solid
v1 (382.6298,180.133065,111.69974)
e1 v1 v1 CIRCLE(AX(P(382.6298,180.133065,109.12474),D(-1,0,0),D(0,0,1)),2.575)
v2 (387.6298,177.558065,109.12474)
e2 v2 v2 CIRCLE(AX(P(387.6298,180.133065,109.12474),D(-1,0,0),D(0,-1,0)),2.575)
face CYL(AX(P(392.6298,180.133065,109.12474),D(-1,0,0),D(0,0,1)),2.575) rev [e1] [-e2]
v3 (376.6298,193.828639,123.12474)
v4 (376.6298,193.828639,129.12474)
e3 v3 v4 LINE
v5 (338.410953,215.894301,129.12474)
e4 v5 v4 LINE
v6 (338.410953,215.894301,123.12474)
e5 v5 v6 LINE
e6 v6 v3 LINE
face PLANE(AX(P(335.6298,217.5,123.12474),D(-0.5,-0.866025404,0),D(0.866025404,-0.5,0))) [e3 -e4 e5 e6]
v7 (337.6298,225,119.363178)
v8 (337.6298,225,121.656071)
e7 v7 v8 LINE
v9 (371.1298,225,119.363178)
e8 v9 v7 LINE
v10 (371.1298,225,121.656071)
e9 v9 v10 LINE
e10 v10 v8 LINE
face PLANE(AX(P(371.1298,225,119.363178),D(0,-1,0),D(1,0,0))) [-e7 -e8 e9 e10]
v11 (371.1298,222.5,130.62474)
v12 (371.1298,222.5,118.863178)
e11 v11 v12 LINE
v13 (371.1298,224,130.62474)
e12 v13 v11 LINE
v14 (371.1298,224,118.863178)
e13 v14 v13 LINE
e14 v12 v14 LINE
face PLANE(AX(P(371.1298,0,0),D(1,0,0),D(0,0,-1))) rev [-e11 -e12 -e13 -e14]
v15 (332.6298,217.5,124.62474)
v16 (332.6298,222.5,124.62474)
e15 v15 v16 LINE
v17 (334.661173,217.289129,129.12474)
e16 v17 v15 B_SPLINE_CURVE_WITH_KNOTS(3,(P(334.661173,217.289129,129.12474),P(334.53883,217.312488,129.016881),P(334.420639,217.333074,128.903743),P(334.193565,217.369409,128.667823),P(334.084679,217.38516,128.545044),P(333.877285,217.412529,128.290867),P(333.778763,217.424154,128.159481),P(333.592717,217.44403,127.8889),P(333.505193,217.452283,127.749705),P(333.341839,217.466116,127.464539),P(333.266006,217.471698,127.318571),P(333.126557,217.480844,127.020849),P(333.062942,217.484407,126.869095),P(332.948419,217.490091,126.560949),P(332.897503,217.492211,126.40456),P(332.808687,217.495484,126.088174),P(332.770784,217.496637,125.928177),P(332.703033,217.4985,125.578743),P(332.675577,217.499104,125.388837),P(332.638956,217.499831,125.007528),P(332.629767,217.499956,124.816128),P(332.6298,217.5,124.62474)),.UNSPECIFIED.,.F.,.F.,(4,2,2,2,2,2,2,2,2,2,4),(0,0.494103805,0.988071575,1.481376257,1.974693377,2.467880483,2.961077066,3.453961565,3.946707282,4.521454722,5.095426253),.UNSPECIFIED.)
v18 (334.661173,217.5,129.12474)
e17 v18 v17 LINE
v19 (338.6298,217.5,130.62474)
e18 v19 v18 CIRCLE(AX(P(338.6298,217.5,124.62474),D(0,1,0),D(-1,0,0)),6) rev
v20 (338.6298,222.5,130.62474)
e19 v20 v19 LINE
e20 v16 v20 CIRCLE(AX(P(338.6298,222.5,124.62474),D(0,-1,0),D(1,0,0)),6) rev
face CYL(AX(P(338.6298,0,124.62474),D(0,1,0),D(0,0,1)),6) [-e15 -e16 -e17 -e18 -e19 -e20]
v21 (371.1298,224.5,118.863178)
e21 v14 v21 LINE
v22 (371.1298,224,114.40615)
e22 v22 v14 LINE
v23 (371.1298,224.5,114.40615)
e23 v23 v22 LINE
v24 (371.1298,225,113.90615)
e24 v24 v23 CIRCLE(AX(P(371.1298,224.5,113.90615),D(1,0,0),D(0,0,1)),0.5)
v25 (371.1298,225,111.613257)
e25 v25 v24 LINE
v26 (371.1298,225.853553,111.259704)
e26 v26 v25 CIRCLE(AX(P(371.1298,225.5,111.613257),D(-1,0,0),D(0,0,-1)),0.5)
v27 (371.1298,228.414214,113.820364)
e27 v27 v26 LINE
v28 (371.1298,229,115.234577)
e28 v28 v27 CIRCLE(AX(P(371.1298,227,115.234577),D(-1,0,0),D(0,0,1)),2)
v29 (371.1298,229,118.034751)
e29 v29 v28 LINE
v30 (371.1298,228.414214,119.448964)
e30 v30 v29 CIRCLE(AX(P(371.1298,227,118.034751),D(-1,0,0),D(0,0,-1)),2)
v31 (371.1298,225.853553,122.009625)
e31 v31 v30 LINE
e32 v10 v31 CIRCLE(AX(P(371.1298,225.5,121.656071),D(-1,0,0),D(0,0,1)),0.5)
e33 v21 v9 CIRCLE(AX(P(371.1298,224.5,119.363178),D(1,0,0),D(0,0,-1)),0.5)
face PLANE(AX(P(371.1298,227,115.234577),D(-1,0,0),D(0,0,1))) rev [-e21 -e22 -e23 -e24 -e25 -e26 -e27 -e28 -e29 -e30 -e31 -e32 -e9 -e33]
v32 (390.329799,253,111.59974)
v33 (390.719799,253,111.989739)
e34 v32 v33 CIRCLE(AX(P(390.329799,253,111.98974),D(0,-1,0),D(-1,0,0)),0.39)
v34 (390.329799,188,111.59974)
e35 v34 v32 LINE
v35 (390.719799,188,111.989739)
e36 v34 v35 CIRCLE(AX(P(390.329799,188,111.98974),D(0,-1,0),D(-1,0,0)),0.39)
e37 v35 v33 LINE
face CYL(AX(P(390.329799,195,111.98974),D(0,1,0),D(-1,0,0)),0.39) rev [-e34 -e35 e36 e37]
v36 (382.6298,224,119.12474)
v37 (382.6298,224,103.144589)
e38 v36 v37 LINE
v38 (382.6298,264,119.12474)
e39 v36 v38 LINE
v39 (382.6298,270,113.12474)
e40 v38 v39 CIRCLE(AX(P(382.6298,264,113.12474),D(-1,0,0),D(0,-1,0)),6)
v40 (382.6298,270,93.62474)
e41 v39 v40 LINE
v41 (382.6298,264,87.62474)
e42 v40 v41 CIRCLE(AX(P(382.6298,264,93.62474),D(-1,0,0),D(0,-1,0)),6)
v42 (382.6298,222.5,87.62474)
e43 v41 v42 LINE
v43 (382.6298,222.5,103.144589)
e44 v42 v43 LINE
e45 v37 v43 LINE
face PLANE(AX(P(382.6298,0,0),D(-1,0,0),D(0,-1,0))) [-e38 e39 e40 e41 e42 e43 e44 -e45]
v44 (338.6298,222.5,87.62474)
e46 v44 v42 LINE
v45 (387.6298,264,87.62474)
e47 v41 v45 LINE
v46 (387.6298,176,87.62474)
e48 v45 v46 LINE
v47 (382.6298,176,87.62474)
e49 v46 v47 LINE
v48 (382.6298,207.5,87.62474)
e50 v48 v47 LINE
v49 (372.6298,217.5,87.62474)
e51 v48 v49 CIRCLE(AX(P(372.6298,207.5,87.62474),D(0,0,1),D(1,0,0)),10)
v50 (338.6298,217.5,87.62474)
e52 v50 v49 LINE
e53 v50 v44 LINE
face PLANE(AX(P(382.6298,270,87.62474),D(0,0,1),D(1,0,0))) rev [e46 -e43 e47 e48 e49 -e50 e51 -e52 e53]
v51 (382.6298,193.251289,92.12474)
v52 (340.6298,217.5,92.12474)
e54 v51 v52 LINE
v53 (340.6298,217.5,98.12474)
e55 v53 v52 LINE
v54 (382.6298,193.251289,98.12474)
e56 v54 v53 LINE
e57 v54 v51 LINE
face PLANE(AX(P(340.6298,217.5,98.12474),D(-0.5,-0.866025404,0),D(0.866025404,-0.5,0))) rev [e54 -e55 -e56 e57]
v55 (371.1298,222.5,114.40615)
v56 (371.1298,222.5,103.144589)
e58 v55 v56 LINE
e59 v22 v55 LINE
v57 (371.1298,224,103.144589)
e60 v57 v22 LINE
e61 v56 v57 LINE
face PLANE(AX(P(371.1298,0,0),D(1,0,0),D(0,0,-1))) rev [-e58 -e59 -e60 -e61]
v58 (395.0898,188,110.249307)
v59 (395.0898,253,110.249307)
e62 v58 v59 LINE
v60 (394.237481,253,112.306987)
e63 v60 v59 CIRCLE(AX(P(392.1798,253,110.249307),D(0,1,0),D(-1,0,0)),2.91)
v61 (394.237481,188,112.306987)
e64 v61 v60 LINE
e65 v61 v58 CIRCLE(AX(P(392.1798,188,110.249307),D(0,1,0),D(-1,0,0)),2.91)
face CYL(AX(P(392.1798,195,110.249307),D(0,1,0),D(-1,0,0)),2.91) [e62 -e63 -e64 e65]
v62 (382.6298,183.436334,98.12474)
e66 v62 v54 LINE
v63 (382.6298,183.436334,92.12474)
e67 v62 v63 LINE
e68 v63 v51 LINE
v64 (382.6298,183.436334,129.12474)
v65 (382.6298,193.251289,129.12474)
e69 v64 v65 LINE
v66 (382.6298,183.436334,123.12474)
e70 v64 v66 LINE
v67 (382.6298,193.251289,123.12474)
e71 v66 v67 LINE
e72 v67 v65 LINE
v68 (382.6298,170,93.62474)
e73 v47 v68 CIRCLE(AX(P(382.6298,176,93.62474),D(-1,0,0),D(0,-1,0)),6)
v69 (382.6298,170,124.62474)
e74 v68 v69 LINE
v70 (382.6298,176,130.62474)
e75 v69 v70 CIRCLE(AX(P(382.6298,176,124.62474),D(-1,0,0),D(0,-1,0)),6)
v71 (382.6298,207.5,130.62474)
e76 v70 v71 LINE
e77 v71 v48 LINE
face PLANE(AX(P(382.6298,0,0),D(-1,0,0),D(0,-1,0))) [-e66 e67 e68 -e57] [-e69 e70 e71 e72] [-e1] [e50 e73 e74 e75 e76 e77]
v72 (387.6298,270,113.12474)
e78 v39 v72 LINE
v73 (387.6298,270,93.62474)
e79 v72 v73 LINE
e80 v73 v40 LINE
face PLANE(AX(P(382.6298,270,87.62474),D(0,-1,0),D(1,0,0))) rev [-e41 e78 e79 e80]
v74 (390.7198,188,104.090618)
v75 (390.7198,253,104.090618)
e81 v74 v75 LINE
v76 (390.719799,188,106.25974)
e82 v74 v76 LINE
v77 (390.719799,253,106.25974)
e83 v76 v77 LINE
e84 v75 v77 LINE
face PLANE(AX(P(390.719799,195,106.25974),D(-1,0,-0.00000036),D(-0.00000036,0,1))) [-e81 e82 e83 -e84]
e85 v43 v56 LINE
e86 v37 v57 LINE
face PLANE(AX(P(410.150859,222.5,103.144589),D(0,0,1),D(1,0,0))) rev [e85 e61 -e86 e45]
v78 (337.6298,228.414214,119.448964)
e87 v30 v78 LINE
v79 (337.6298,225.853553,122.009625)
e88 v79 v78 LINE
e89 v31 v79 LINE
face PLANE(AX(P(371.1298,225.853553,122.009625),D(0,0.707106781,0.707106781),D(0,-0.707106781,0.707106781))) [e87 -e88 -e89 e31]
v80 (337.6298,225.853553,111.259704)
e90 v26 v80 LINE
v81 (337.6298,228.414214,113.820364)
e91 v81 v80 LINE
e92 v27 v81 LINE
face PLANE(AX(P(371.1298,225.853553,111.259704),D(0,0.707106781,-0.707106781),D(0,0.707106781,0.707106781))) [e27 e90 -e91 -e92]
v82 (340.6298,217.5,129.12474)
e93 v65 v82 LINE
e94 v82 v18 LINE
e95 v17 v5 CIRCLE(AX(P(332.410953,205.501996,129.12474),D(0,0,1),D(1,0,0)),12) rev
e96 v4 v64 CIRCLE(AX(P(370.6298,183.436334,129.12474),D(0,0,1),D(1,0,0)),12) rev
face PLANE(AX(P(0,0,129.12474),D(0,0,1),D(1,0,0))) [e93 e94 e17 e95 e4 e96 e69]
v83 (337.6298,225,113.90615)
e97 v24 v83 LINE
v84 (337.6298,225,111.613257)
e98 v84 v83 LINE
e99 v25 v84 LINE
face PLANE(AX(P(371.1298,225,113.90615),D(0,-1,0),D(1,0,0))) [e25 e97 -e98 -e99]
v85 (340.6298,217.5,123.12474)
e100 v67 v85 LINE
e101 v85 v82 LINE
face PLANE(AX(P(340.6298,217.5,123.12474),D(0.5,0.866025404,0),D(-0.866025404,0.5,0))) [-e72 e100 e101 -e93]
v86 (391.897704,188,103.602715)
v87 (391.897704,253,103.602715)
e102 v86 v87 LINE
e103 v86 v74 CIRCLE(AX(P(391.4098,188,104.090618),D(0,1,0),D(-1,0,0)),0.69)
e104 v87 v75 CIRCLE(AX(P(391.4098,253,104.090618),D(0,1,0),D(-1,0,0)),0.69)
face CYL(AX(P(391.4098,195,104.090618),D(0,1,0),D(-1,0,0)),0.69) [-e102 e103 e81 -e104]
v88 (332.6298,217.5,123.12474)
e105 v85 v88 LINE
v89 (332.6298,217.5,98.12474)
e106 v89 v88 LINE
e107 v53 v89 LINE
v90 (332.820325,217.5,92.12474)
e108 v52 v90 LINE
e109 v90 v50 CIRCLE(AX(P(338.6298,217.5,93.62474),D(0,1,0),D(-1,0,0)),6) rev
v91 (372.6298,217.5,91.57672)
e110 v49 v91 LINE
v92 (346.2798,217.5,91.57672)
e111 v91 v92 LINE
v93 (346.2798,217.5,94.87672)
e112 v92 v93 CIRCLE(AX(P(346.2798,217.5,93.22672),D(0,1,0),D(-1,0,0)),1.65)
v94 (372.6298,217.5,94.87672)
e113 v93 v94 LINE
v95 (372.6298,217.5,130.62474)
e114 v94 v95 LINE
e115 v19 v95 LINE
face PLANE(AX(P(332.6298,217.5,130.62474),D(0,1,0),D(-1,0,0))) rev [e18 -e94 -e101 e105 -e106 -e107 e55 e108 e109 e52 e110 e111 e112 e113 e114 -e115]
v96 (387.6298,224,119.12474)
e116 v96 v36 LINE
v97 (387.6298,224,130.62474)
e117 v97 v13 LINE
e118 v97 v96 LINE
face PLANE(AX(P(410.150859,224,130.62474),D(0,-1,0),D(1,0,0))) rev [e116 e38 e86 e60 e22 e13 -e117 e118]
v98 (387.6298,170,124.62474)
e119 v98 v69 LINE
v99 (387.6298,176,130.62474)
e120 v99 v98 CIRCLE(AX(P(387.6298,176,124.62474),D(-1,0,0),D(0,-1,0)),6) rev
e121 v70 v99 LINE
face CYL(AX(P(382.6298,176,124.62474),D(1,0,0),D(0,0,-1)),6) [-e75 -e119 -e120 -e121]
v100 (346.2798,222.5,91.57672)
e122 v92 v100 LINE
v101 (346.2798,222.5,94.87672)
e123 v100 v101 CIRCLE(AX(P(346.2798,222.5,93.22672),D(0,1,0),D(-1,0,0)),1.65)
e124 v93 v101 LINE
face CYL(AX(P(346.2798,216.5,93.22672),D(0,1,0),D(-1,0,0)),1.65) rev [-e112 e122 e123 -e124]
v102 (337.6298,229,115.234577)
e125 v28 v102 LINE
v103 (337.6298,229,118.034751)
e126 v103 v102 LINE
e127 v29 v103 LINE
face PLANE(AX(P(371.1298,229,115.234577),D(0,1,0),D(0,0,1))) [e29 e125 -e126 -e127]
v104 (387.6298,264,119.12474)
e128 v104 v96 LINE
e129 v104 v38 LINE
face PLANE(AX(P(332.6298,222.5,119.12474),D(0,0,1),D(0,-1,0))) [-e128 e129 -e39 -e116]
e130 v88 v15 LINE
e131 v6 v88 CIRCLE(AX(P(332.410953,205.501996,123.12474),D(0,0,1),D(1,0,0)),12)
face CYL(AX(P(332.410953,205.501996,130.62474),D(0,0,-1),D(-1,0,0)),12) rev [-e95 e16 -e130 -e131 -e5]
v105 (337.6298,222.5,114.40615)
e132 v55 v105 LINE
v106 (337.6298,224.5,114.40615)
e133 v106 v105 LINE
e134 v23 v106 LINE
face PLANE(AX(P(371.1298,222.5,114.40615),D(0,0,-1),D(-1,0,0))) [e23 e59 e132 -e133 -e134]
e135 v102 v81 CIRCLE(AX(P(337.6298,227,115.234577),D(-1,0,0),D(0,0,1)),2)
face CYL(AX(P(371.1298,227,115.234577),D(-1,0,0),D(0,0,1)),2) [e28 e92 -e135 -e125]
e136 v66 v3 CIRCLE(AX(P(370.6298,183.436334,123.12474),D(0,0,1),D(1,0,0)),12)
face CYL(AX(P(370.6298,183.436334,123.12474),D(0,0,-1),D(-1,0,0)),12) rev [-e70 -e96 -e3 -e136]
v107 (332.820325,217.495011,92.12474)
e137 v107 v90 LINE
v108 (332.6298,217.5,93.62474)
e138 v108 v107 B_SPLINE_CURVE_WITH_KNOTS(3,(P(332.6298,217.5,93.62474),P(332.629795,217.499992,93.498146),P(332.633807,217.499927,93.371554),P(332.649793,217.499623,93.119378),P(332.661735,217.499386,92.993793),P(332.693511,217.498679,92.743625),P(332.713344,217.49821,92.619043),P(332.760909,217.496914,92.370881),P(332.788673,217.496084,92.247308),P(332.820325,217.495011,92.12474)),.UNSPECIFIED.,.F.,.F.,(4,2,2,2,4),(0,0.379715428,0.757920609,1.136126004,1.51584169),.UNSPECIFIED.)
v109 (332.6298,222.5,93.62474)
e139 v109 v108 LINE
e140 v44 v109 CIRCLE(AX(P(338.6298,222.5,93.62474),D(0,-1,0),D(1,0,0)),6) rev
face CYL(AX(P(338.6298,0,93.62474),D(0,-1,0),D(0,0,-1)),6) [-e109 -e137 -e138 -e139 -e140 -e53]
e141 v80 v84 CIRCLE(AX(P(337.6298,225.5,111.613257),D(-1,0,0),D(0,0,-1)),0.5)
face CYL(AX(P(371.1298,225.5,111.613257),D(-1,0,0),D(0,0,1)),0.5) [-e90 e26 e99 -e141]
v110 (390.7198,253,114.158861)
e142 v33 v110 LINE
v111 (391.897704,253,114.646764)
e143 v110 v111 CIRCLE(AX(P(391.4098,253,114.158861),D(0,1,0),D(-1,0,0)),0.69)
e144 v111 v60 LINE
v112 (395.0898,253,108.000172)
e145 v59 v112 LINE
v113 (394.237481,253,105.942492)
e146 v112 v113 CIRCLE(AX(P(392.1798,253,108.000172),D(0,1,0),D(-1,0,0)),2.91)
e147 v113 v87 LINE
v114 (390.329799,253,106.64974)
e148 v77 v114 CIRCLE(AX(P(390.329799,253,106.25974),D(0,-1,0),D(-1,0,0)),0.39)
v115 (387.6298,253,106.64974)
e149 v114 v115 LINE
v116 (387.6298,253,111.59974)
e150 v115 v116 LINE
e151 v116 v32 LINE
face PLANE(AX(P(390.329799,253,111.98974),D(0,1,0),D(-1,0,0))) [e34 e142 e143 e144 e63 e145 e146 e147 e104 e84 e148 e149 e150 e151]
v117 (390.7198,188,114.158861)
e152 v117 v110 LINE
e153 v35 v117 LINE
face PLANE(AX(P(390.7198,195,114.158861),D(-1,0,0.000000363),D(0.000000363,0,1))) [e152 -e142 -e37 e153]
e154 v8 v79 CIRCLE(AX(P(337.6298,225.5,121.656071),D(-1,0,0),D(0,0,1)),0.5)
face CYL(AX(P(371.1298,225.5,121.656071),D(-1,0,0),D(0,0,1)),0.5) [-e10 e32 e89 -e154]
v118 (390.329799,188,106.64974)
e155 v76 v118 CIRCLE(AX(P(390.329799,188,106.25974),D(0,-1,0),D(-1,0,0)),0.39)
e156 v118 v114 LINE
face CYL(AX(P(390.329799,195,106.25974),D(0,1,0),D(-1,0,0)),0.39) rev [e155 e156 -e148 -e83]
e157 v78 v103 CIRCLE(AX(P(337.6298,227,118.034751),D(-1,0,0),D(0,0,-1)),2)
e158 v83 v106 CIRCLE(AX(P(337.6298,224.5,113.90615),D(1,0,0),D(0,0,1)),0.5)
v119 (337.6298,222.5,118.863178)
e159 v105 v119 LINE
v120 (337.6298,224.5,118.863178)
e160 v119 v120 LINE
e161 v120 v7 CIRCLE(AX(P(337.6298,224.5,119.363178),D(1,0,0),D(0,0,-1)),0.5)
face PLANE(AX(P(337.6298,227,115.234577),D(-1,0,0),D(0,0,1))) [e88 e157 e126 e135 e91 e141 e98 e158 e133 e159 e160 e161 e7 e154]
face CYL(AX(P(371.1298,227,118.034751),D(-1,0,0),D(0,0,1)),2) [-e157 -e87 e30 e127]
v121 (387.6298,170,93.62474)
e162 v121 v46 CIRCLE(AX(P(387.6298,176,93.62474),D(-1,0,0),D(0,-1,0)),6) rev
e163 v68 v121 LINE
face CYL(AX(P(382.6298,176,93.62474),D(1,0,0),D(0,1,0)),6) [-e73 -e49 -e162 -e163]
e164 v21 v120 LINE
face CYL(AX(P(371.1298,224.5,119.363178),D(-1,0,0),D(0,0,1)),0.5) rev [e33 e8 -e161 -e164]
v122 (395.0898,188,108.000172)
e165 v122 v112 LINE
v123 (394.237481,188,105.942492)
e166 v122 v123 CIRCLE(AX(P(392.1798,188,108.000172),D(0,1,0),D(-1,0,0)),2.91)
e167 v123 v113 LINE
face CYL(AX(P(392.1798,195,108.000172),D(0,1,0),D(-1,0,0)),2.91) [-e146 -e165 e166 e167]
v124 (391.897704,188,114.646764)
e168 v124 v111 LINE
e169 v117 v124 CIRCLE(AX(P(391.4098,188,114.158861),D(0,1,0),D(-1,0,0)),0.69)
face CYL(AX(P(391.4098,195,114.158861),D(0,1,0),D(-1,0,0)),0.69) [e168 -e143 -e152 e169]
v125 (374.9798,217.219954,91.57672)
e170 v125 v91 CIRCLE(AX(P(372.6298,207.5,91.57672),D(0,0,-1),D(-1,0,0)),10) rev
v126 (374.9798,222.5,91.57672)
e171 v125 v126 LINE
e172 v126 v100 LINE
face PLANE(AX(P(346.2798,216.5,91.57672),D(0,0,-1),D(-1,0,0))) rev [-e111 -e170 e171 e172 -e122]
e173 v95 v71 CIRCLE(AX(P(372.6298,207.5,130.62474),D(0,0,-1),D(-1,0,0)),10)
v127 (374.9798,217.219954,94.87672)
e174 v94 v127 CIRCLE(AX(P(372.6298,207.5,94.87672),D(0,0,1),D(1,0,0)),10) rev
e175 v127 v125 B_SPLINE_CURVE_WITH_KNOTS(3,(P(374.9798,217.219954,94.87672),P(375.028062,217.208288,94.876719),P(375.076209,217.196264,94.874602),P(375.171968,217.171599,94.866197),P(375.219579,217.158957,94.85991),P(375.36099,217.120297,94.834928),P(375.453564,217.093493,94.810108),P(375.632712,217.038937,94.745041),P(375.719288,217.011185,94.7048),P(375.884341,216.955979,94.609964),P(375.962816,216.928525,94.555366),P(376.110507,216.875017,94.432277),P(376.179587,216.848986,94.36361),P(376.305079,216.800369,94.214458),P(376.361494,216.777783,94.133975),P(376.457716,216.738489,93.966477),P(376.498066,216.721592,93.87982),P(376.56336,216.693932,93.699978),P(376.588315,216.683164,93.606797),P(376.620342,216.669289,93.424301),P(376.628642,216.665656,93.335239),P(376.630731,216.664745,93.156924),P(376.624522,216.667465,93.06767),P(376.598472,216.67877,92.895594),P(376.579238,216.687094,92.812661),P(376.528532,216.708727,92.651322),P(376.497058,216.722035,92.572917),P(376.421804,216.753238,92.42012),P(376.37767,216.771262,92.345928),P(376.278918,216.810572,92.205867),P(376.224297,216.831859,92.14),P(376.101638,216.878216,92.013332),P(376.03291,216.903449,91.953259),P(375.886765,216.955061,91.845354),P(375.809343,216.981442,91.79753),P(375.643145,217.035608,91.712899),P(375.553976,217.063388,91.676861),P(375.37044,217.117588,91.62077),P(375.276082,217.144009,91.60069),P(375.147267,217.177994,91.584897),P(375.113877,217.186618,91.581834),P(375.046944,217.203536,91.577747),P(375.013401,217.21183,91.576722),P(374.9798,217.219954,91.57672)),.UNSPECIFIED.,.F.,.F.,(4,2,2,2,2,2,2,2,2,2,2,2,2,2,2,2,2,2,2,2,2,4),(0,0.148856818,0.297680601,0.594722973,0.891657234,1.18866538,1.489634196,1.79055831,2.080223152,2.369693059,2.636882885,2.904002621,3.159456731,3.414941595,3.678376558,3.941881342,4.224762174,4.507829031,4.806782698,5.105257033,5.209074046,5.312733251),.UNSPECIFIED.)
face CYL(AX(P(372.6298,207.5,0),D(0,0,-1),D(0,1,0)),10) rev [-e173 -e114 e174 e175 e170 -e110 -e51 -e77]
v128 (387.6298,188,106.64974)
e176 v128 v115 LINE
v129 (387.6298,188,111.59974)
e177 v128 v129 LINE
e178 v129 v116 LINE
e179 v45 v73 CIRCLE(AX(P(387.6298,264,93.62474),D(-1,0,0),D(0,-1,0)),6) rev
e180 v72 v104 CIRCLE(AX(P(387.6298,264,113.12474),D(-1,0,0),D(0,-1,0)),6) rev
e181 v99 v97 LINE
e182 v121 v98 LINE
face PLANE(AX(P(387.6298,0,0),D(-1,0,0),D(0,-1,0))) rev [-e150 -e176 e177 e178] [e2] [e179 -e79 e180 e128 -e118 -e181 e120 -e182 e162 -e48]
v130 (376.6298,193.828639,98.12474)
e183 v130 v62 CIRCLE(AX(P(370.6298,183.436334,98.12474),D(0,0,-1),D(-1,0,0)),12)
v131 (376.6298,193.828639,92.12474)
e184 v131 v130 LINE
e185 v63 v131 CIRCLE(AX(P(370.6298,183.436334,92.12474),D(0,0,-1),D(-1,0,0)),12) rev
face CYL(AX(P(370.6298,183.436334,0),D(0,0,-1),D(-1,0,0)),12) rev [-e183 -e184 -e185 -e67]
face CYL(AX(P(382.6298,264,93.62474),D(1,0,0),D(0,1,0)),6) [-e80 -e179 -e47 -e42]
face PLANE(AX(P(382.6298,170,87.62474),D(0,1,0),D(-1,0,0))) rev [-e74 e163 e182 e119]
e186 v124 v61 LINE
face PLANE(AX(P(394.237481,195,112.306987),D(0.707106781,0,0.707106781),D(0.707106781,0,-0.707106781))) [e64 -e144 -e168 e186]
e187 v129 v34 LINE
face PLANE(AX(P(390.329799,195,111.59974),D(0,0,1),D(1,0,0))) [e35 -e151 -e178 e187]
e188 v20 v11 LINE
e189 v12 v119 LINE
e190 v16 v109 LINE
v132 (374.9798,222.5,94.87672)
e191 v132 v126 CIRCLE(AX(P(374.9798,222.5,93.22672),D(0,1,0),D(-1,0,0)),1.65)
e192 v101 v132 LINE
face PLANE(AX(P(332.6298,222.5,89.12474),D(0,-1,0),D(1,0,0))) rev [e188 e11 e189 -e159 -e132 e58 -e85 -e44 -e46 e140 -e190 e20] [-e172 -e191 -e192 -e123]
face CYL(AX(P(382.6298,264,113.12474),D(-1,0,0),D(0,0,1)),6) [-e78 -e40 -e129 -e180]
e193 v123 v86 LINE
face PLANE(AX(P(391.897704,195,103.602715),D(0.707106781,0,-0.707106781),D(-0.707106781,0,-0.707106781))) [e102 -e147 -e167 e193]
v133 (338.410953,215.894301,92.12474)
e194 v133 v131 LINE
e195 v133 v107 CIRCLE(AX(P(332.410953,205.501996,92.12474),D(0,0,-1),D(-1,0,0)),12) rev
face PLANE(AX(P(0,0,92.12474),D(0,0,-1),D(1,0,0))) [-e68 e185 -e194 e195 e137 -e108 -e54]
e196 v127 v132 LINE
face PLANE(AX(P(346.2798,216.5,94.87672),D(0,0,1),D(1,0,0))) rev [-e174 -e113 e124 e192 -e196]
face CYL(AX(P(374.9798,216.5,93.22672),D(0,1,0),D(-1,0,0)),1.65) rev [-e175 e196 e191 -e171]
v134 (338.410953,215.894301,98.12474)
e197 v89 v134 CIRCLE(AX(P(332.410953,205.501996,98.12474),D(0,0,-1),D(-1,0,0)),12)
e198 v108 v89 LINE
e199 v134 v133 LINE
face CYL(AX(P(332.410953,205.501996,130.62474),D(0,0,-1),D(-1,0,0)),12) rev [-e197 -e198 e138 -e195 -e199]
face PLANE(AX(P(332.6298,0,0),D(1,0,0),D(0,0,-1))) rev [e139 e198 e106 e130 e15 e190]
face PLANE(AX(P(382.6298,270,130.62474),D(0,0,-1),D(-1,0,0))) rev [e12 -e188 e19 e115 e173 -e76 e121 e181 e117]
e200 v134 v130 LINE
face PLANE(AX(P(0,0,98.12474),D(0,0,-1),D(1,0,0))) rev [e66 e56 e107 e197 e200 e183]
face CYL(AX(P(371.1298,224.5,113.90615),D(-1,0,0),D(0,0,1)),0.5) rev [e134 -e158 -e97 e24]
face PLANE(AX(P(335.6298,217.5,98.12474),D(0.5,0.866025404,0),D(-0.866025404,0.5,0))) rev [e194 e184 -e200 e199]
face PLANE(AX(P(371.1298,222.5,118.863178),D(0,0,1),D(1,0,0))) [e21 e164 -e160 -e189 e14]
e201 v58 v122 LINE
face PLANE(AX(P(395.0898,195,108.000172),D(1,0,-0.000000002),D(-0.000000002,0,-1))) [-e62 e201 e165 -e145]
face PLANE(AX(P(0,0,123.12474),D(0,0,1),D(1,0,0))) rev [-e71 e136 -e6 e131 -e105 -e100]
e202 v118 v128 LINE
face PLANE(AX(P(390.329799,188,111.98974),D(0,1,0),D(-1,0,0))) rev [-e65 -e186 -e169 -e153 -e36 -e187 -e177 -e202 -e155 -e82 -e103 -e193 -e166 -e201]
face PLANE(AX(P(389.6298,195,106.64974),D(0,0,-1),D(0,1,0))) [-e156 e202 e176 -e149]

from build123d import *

# Parameters (mm, degrees)
BOSS_EXTRUDE5_DEPTH  = 50
SKETCH11_W           = 43
SKETCH11_H           = 100
BOSS_EXTRUDE6_DEPTH  = 5
BOSS_EXTRUDE8_DEPTH  = 55
SKETCH13_W           = 11.5
SKETCH13_H           = 47.5
CUT_EXTRUDE1_DEPTH   = 55
BOSS_EXTRUDE9_DEPTH  = 6
FILLET7_R            = 12
FILLET7_OF_MIRROR1_R = 12
FILLET8_R            = 6
BOSS_EXTRUDE10_START = 8
BOSS_EXTRUDE10_DEPTH = 8
FILLET12_R           = 10
BOSS_EXTRUDE11_DEPTH = 57
SKETCH16_R           = 2.575
CUT_EXTRUDE2_DEPTH   = 10
SKETCH17_W           = 27.480150942
SKETCH17_H           = 1.5
BOSS_EXTRUDE12_DEPTH = 11.5
SKETCH18_W           = 11.5
SKETCH18_H           = 1.5
BOSS_EXTRUDE13_DEPTH = 5
BOSS_EXTRUDE15_START = -5
BOSS_EXTRUDE15_DEPTH = 33.5
CUT_EXTRUDE3_DEPTH   = 6


with BuildPart() as part:
    # Sketch9 → Boss-Extrude5 (new body)
    with BuildSketch(Plane(origin=(0, 245, 0), x_dir=(1, 0, 0), z_dir=(0, 1, 0))):
        with BuildLine():
            Line((389.629800237, -111.599739584), (387.629800237, -111.599739584))
            Line((387.629800237, -111.599739584), (387.629800237, -106.649739584))
            Line((387.629800237, -106.649739584), (389.629800237, -106.649739584))
            Line((389.629800237, -106.649739584), (390.329799474, -106.649739584))
            ThreePointArc((390.329799474, -106.649739584), (390.605571069, -106.535511279), (390.719799474, -106.259739725))
            Line((390.719799474, -106.259739725), (390.719800256, -104.090618139))
            ThreePointArc((390.719800256, -104.090618139), (391.145748802, -103.453141463), (391.897703935, -103.602714709))
            Line((391.897703935, -103.602714709), (394.237480965, -105.942491739))
            ThreePointArc((394.237480965, -105.942491739), (394.868289671, -106.886563682), (395.089800232, -108.000172467))
            Line((395.089800232, -108.000172467), (395.089800237, -110.249306685))
            ThreePointArc((395.089800237, -110.249306685), (394.868289678, -111.362915477), (394.23748097, -112.306987424))
            Line((394.23748097, -112.306987424), (391.897703941, -114.646764454))
            ThreePointArc((391.897703941, -114.646764454), (391.145748809, -114.7963377), (390.719800262, -114.158861025))
            Line((390.719800262, -114.158861025), (390.719799474, -111.989739443))
            ThreePointArc((390.719799474, -111.989739443), (390.605571069, -111.71396789), (390.329799474, -111.599739584))
            Line((390.329799474, -111.599739584), (389.629800237, -111.599739584))
        make_face()
    extrude(amount=-BOSS_EXTRUDE5_DEPTH)

    # Sketch11 → Boss-Extrude6 (add)
    with BuildSketch(Plane.ZY.offset(-387.629800242)):
        with Locations((109.124739584, 220)):
            Rectangle(SKETCH11_W, SKETCH11_H)
    extrude(amount=BOSS_EXTRUDE6_DEPTH)

    # Sketch12 → Boss-Extrude8 (add)
    with BuildSketch(Plane.ZY.offset(-387.629800242)):
        Polygon((130.624739584, 222.5), (89.124739584, 222.5), (87.624739584, 222.5), (87.624739584, 217.5), (89.124739584, 217.5), (130.624739584, 217.5), align=None)
    extrude(amount=BOSS_EXTRUDE8_DEPTH)

    # Sketch13 → Cut-Extrude1 (cut)
    with BuildSketch(Plane.ZY.offset(-387.629800242)):
        with Locations((124.874739584, 246.25)):
            Rectangle(SKETCH13_W, SKETCH13_H)
    extrude(amount=CUT_EXTRUDE1_DEPTH, mode=Mode.SUBTRACT)

    # Sketch15 → Boss-Extrude9 (add)
    with BuildSketch(Plane.XY.offset(129.124739584)):
        Polygon((335.629800242, 217.5), (382.629800242, 190.364537348), (382.629800242, 193.251288694), (340.629800242, 217.5), align=None)
    boss_extrude9 = extrude(amount=-BOSS_EXTRUDE9_DEPTH)

    # Fillet7
    # the kernel refuses this fillet: 12 mm, written as the material it adds along each edge
    with BuildSketch(Plane(origin=(335.629800242, 217.5, 129.124739584), x_dir=(-1, 0, 0), z_dir=(0, 0, -1))) as fillet7_piece_1:
        with BuildLine():
            CenterArc((3.218847051, -11.998004249), FILLET7_R, 91.044975628, 28.955024372)
            Line((-2.781152949, -1.605699404), (-2.901152949, -1.397853307))
            Line((-2.901152949, -1.397853307), (-0.12, 0.207846097))
            Line((-0.12, 0.207846097), (0, 0.24))
            ThreePointArc((0, 0.24), (1.5, 0.24), (2.995623059, 0.239960085))
            Line((2.995623059, 0.239960085), (3, 0))
        make_face()
    extrude(amount=6)
    with BuildSketch(Plane(origin=(382.629800242, 190.364537348, 129.124739584), x_dir=(0, -1, 0), z_dir=(0, 0, -1))) as fillet7_piece_2:
        with BuildLine():
            CenterArc((FILLET7_R * 0.57735026919, FILLET7_R), FILLET7_R, 210, 60)
            Line((-FILLET7_R * 0.288675134595, FILLET7_R * 0.5), (-FILLET7_R * 0.305995642671, FILLET7_R * 0.49))
            Line((-FILLET7_R * 0.305995642671, FILLET7_R * 0.49), (-FILLET7_R * 0.0115470053838, -FILLET7_R * 0.02))
            Line((-FILLET7_R * 0.0115470053838, -FILLET7_R * 0.02), (FILLET7_R * 0.57735026919, -FILLET7_R * 0.02))
            Line((FILLET7_R * 0.57735026919, -FILLET7_R * 0.02), (FILLET7_R * 0.57735026919, 0))
        make_face()
    extrude(amount=6)

    # Mirror1: Boss-Extrude9 across plane
    add(boss_extrude9.mirror(Plane.XY.offset(110.624739584)))

    # Fillet7 of Mirror1
    # the kernel refuses this fillet: 12 mm, written as the material it adds along each edge
    with BuildSketch(Plane(origin=(335.629800242, 217.5, 92.124739584), x_dir=(-1, 0, 0), z_dir=(0, 0, 1))) as fillet7_of_mirror1_piece_1:
        with BuildLine():
            CenterArc((3.218847051, 11.998004249), FILLET7_OF_MIRROR1_R, 240, 28.955024372)
            Line((-2.781152949, 1.605699404), (-2.901152949, 1.397853307))
            Line((-2.901152949, 1.397853307), (-0.12, -0.207846097))
            Line((-0.12, -0.207846097), (0, -0.24))
            ThreePointArc((0, -0.24), (1.5, -0.24), (2.995623059, -0.239960085))
            Line((2.995623059, -0.239960085), (3, 0))
        make_face()
    extrude(amount=6)
    with BuildSketch(Plane(origin=(382.629800242, 190.364537348, 92.124739584), x_dir=(0, -1, 0), z_dir=(0, 0, 1))) as fillet7_of_mirror1_piece_2:
        with BuildLine():
            CenterArc((FILLET7_OF_MIRROR1_R * 0.57735026919, -FILLET7_OF_MIRROR1_R), FILLET7_OF_MIRROR1_R, 90, 60)
            Line((-FILLET7_OF_MIRROR1_R * 0.288675134595, -FILLET7_OF_MIRROR1_R * 0.5), (-FILLET7_OF_MIRROR1_R * 0.305995642671, -FILLET7_OF_MIRROR1_R * 0.49))
            Line((-FILLET7_OF_MIRROR1_R * 0.305995642671, -FILLET7_OF_MIRROR1_R * 0.49), (-FILLET7_OF_MIRROR1_R * 0.0115470053838, FILLET7_OF_MIRROR1_R * 0.02))
            Line((-FILLET7_OF_MIRROR1_R * 0.0115470053838, FILLET7_OF_MIRROR1_R * 0.02), (FILLET7_OF_MIRROR1_R * 0.57735026919, FILLET7_OF_MIRROR1_R * 0.02))
            Line((FILLET7_OF_MIRROR1_R * 0.57735026919, FILLET7_OF_MIRROR1_R * 0.02), (FILLET7_OF_MIRROR1_R * 0.57735026919, 0))
        make_face()
    extrude(amount=6)

    # Fillet8
    # the kernel refuses this fillet: 6 mm, written as the material it takes off along each edge
    with BuildSketch(Plane(origin=(402.629800242, 270, 87.624739584), x_dir=(0, 0, 1), z_dir=(-1, 0, 0)), Plane(origin=(332.629800242, 237.5, 87.624739584), x_dir=(0, 0, 1), z_dir=(0, -1, 0)), Plane(origin=(402.629800242, 270, 119.124739584), x_dir=(0, -1, 0), z_dir=(-1, 0, 0))) as fillet8_piece_1:
        with BuildLine():
            CenterArc((FILLET8_R, -FILLET8_R), FILLET8_R, 90, 90)
            Line((0, -FILLET8_R), (0, 0))
            Line((0, 0), (FILLET8_R, 0))
        make_face()
    extrude(amount=35, mode=Mode.SUBTRACT)
    with BuildSketch(Plane(origin=(402.629800242, 170, 87.624739584), x_dir=(0, 0, 1), z_dir=(-1, 0, 0)), Plane(origin=(402.629800242, 170, 130.624739584), x_dir=(0, 1, 0), z_dir=(-1, 0, 0)), Plane(origin=(332.629800242, 202.5, 130.624739584), x_dir=(1, 0, 0), z_dir=(0, 1, 0))) as fillet8_piece_2:
        with BuildLine():
            CenterArc((FILLET8_R, FILLET8_R), FILLET8_R, 180, 90)
            Line((0, FILLET8_R), (0, 0))
            Line((0, 0), (FILLET8_R, 0))
        make_face()
    extrude(amount=35, mode=Mode.SUBTRACT)

    # Sketch9<2> → Boss-Extrude10 (add)
    with BuildSketch(Plane(origin=(0, 245, 0), x_dir=(1, 0, 0), z_dir=(0, 1, 0)).offset(BOSS_EXTRUDE10_START)):
        with BuildLine():
            Line((389.629800237, -111.599739584), (387.629800237, -111.599739584))
            Line((387.629800237, -111.599739584), (387.629800237, -106.649739584))
            Line((387.629800237, -106.649739584), (389.629800237, -106.649739584))
            Line((389.629800237, -106.649739584), (390.329799474, -106.649739584))
            ThreePointArc((390.329799474, -106.649739584), (390.605571069, -106.535511279), (390.719799474, -106.259739725))
            Line((390.719799474, -106.259739725), (390.719800256, -104.090618139))
            ThreePointArc((390.719800256, -104.090618139), (391.145748802, -103.453141463), (391.897703935, -103.602714709))
            Line((391.897703935, -103.602714709), (394.237480965, -105.942491739))
            ThreePointArc((394.237480965, -105.942491739), (394.868289671, -106.886563682), (395.089800232, -108.000172467))
            Line((395.089800232, -108.000172467), (395.089800237, -110.249306685))
            ThreePointArc((395.089800237, -110.249306685), (394.868289678, -111.362915477), (394.23748097, -112.306987424))
            Line((394.23748097, -112.306987424), (391.897703941, -114.646764454))
            ThreePointArc((391.897703941, -114.646764454), (391.145748809, -114.7963377), (390.719800262, -114.158861025))
            Line((390.719800262, -114.158861025), (390.719799474, -111.989739443))
            ThreePointArc((390.719799474, -111.989739443), (390.605571069, -111.71396789), (390.329799474, -111.599739584))
            Line((390.329799474, -111.599739584), (389.629800237, -111.599739584))
        make_face()
    extrude(amount=-BOSS_EXTRUDE10_DEPTH)

    # Fillet12
    fillet12_edges = [part.edges().sort_by_distance(p)[0] for p in [
        (382.629800242, 217.5, 109.124739584),
    ]]
    fillet(fillet12_edges, radius=FILLET12_R)

    # Sketch9<3> → Boss-Extrude11 (add)
    with BuildSketch(Plane(origin=(0, 245, 0), x_dir=(1, 0, 0), z_dir=(0, 1, 0))):
        with BuildLine():
            Line((389.629800237, -111.599739584), (387.629800237, -111.599739584))
            Line((387.629800237, -111.599739584), (387.629800237, -106.649739584))
            Line((387.629800237, -106.649739584), (389.629800237, -106.649739584))
            Line((389.629800237, -106.649739584), (390.329799474, -106.649739584))
            ThreePointArc((390.329799474, -106.649739584), (390.605571069, -106.535511279), (390.719799474, -106.259739725))
            Line((390.719799474, -106.259739725), (390.719800256, -104.090618139))
            ThreePointArc((390.719800256, -104.090618139), (391.145748802, -103.453141463), (391.897703935, -103.602714709))
            Line((391.897703935, -103.602714709), (394.237480965, -105.942491739))
            ThreePointArc((394.237480965, -105.942491739), (394.868289671, -106.886563682), (395.089800232, -108.000172467))
            Line((395.089800232, -108.000172467), (395.089800237, -110.249306685))
            ThreePointArc((395.089800237, -110.249306685), (394.868289678, -111.362915477), (394.23748097, -112.306987424))
            Line((394.23748097, -112.306987424), (391.897703941, -114.646764454))
            ThreePointArc((391.897703941, -114.646764454), (391.145748809, -114.7963377), (390.719800262, -114.158861025))
            Line((390.719800262, -114.158861025), (390.719799474, -111.989739443))
            ThreePointArc((390.719799474, -111.989739443), (390.605571069, -111.71396789), (390.329799474, -111.599739584))
            Line((390.329799474, -111.599739584), (389.629800237, -111.599739584))
        make_face()
    extrude(amount=-BOSS_EXTRUDE11_DEPTH)

    # Sketch16 → Cut-Extrude2 (cut)
    with BuildSketch(Plane.ZY.offset(-382.629800242)):
        with Locations((109.124739584, 180.133064736)):
            Circle(SKETCH16_R)
    extrude(amount=-CUT_EXTRUDE2_DEPTH, mode=Mode.SUBTRACT)

    # Sketch17 → Boss-Extrude12 (add)
    with BuildSketch(Plane(origin=(371.129800242, 0, 0), x_dir=(0, 0, -1), z_dir=(1, 0, 0))):
        with Locations((-116.884664113, 223.25)):
            Rectangle(SKETCH17_W, SKETCH17_H)
    extrude(amount=BOSS_EXTRUDE12_DEPTH)

    # Sketch18 → Boss-Extrude13 (add)
    with BuildSketch(Plane(origin=(382.629800242, 0, 0), x_dir=(0, 0, -1), z_dir=(1, 0, 0))):
        with Locations((-124.874739584, 223.25)):
            Rectangle(SKETCH18_W, SKETCH18_H)
    extrude(amount=BOSS_EXTRUDE13_DEPTH)

    # Sketch22 → Boss-Extrude15 (add)
    with BuildSketch(Plane.ZY.offset(-332.629800242).offset(BOSS_EXTRUDE15_START)):
        with BuildLine():
            Line((114.406150208, 222.5), (114.406150208, 224.5))
            ThreePointArc((114.406150208, 224.5), (114.259703598, 224.853553391), (113.906150208, 225))
            Line((113.906150208, 225), (111.613256989, 225))
            ThreePointArc((111.613256989, 225), (111.151317223, 225.308658284), (111.259703598, 225.853553391))
            Line((111.259703598, 225.853553391), (113.82036377, 228.414213562))
            ThreePointArc((113.82036377, 228.414213562), (114.469210468, 228.847759065), (115.234577333, 229))
            Line((115.234577333, 229), (116.634664113, 229))
            Line((116.634664113, 229), (118.034750894, 229))
            ThreePointArc((118.034750894, 229), (118.800117758, 228.847759065), (119.448964456, 228.414213562))
            Line((119.448964456, 228.414213562), (122.009624628, 225.853553391))
            ThreePointArc((122.009624628, 225.853553391), (122.118011003, 225.308658284), (121.656071237, 225))
            Line((121.656071237, 225), (119.363178018, 225))
            ThreePointArc((119.363178018, 225), (119.009624628, 224.853553391), (118.863178018, 224.5))
            Line((118.863178018, 224.5), (118.863178018, 222.5))
            Line((118.863178018, 222.5), (114.406150208, 222.5))
        make_face()
    extrude(amount=-BOSS_EXTRUDE15_DEPTH)

    # Sketch23 → Cut-Extrude3 (cut)
    with BuildSketch(Plane(origin=(0, 222.5, 0), x_dir=(1, 0, 0), z_dir=(0, 1, 0))):
        with BuildLine():
            Line((346.279800242, -91.576720164), (374.979800242, -91.576720164))
            ThreePointArc((374.979800242, -91.576720164), (376.629800242, -93.226720164), (374.979800242, -94.876720164))
            Line((374.979800242, -94.876720164), (346.279800242, -94.876720164))
            ThreePointArc((346.279800242, -94.876720164), (344.629800242, -93.226720164), (346.279800242, -91.576720164))
        make_face()
    extrude(amount=-CUT_EXTRUDE3_DEPTH, mode=Mode.SUBTRACT)


solid = part.part
